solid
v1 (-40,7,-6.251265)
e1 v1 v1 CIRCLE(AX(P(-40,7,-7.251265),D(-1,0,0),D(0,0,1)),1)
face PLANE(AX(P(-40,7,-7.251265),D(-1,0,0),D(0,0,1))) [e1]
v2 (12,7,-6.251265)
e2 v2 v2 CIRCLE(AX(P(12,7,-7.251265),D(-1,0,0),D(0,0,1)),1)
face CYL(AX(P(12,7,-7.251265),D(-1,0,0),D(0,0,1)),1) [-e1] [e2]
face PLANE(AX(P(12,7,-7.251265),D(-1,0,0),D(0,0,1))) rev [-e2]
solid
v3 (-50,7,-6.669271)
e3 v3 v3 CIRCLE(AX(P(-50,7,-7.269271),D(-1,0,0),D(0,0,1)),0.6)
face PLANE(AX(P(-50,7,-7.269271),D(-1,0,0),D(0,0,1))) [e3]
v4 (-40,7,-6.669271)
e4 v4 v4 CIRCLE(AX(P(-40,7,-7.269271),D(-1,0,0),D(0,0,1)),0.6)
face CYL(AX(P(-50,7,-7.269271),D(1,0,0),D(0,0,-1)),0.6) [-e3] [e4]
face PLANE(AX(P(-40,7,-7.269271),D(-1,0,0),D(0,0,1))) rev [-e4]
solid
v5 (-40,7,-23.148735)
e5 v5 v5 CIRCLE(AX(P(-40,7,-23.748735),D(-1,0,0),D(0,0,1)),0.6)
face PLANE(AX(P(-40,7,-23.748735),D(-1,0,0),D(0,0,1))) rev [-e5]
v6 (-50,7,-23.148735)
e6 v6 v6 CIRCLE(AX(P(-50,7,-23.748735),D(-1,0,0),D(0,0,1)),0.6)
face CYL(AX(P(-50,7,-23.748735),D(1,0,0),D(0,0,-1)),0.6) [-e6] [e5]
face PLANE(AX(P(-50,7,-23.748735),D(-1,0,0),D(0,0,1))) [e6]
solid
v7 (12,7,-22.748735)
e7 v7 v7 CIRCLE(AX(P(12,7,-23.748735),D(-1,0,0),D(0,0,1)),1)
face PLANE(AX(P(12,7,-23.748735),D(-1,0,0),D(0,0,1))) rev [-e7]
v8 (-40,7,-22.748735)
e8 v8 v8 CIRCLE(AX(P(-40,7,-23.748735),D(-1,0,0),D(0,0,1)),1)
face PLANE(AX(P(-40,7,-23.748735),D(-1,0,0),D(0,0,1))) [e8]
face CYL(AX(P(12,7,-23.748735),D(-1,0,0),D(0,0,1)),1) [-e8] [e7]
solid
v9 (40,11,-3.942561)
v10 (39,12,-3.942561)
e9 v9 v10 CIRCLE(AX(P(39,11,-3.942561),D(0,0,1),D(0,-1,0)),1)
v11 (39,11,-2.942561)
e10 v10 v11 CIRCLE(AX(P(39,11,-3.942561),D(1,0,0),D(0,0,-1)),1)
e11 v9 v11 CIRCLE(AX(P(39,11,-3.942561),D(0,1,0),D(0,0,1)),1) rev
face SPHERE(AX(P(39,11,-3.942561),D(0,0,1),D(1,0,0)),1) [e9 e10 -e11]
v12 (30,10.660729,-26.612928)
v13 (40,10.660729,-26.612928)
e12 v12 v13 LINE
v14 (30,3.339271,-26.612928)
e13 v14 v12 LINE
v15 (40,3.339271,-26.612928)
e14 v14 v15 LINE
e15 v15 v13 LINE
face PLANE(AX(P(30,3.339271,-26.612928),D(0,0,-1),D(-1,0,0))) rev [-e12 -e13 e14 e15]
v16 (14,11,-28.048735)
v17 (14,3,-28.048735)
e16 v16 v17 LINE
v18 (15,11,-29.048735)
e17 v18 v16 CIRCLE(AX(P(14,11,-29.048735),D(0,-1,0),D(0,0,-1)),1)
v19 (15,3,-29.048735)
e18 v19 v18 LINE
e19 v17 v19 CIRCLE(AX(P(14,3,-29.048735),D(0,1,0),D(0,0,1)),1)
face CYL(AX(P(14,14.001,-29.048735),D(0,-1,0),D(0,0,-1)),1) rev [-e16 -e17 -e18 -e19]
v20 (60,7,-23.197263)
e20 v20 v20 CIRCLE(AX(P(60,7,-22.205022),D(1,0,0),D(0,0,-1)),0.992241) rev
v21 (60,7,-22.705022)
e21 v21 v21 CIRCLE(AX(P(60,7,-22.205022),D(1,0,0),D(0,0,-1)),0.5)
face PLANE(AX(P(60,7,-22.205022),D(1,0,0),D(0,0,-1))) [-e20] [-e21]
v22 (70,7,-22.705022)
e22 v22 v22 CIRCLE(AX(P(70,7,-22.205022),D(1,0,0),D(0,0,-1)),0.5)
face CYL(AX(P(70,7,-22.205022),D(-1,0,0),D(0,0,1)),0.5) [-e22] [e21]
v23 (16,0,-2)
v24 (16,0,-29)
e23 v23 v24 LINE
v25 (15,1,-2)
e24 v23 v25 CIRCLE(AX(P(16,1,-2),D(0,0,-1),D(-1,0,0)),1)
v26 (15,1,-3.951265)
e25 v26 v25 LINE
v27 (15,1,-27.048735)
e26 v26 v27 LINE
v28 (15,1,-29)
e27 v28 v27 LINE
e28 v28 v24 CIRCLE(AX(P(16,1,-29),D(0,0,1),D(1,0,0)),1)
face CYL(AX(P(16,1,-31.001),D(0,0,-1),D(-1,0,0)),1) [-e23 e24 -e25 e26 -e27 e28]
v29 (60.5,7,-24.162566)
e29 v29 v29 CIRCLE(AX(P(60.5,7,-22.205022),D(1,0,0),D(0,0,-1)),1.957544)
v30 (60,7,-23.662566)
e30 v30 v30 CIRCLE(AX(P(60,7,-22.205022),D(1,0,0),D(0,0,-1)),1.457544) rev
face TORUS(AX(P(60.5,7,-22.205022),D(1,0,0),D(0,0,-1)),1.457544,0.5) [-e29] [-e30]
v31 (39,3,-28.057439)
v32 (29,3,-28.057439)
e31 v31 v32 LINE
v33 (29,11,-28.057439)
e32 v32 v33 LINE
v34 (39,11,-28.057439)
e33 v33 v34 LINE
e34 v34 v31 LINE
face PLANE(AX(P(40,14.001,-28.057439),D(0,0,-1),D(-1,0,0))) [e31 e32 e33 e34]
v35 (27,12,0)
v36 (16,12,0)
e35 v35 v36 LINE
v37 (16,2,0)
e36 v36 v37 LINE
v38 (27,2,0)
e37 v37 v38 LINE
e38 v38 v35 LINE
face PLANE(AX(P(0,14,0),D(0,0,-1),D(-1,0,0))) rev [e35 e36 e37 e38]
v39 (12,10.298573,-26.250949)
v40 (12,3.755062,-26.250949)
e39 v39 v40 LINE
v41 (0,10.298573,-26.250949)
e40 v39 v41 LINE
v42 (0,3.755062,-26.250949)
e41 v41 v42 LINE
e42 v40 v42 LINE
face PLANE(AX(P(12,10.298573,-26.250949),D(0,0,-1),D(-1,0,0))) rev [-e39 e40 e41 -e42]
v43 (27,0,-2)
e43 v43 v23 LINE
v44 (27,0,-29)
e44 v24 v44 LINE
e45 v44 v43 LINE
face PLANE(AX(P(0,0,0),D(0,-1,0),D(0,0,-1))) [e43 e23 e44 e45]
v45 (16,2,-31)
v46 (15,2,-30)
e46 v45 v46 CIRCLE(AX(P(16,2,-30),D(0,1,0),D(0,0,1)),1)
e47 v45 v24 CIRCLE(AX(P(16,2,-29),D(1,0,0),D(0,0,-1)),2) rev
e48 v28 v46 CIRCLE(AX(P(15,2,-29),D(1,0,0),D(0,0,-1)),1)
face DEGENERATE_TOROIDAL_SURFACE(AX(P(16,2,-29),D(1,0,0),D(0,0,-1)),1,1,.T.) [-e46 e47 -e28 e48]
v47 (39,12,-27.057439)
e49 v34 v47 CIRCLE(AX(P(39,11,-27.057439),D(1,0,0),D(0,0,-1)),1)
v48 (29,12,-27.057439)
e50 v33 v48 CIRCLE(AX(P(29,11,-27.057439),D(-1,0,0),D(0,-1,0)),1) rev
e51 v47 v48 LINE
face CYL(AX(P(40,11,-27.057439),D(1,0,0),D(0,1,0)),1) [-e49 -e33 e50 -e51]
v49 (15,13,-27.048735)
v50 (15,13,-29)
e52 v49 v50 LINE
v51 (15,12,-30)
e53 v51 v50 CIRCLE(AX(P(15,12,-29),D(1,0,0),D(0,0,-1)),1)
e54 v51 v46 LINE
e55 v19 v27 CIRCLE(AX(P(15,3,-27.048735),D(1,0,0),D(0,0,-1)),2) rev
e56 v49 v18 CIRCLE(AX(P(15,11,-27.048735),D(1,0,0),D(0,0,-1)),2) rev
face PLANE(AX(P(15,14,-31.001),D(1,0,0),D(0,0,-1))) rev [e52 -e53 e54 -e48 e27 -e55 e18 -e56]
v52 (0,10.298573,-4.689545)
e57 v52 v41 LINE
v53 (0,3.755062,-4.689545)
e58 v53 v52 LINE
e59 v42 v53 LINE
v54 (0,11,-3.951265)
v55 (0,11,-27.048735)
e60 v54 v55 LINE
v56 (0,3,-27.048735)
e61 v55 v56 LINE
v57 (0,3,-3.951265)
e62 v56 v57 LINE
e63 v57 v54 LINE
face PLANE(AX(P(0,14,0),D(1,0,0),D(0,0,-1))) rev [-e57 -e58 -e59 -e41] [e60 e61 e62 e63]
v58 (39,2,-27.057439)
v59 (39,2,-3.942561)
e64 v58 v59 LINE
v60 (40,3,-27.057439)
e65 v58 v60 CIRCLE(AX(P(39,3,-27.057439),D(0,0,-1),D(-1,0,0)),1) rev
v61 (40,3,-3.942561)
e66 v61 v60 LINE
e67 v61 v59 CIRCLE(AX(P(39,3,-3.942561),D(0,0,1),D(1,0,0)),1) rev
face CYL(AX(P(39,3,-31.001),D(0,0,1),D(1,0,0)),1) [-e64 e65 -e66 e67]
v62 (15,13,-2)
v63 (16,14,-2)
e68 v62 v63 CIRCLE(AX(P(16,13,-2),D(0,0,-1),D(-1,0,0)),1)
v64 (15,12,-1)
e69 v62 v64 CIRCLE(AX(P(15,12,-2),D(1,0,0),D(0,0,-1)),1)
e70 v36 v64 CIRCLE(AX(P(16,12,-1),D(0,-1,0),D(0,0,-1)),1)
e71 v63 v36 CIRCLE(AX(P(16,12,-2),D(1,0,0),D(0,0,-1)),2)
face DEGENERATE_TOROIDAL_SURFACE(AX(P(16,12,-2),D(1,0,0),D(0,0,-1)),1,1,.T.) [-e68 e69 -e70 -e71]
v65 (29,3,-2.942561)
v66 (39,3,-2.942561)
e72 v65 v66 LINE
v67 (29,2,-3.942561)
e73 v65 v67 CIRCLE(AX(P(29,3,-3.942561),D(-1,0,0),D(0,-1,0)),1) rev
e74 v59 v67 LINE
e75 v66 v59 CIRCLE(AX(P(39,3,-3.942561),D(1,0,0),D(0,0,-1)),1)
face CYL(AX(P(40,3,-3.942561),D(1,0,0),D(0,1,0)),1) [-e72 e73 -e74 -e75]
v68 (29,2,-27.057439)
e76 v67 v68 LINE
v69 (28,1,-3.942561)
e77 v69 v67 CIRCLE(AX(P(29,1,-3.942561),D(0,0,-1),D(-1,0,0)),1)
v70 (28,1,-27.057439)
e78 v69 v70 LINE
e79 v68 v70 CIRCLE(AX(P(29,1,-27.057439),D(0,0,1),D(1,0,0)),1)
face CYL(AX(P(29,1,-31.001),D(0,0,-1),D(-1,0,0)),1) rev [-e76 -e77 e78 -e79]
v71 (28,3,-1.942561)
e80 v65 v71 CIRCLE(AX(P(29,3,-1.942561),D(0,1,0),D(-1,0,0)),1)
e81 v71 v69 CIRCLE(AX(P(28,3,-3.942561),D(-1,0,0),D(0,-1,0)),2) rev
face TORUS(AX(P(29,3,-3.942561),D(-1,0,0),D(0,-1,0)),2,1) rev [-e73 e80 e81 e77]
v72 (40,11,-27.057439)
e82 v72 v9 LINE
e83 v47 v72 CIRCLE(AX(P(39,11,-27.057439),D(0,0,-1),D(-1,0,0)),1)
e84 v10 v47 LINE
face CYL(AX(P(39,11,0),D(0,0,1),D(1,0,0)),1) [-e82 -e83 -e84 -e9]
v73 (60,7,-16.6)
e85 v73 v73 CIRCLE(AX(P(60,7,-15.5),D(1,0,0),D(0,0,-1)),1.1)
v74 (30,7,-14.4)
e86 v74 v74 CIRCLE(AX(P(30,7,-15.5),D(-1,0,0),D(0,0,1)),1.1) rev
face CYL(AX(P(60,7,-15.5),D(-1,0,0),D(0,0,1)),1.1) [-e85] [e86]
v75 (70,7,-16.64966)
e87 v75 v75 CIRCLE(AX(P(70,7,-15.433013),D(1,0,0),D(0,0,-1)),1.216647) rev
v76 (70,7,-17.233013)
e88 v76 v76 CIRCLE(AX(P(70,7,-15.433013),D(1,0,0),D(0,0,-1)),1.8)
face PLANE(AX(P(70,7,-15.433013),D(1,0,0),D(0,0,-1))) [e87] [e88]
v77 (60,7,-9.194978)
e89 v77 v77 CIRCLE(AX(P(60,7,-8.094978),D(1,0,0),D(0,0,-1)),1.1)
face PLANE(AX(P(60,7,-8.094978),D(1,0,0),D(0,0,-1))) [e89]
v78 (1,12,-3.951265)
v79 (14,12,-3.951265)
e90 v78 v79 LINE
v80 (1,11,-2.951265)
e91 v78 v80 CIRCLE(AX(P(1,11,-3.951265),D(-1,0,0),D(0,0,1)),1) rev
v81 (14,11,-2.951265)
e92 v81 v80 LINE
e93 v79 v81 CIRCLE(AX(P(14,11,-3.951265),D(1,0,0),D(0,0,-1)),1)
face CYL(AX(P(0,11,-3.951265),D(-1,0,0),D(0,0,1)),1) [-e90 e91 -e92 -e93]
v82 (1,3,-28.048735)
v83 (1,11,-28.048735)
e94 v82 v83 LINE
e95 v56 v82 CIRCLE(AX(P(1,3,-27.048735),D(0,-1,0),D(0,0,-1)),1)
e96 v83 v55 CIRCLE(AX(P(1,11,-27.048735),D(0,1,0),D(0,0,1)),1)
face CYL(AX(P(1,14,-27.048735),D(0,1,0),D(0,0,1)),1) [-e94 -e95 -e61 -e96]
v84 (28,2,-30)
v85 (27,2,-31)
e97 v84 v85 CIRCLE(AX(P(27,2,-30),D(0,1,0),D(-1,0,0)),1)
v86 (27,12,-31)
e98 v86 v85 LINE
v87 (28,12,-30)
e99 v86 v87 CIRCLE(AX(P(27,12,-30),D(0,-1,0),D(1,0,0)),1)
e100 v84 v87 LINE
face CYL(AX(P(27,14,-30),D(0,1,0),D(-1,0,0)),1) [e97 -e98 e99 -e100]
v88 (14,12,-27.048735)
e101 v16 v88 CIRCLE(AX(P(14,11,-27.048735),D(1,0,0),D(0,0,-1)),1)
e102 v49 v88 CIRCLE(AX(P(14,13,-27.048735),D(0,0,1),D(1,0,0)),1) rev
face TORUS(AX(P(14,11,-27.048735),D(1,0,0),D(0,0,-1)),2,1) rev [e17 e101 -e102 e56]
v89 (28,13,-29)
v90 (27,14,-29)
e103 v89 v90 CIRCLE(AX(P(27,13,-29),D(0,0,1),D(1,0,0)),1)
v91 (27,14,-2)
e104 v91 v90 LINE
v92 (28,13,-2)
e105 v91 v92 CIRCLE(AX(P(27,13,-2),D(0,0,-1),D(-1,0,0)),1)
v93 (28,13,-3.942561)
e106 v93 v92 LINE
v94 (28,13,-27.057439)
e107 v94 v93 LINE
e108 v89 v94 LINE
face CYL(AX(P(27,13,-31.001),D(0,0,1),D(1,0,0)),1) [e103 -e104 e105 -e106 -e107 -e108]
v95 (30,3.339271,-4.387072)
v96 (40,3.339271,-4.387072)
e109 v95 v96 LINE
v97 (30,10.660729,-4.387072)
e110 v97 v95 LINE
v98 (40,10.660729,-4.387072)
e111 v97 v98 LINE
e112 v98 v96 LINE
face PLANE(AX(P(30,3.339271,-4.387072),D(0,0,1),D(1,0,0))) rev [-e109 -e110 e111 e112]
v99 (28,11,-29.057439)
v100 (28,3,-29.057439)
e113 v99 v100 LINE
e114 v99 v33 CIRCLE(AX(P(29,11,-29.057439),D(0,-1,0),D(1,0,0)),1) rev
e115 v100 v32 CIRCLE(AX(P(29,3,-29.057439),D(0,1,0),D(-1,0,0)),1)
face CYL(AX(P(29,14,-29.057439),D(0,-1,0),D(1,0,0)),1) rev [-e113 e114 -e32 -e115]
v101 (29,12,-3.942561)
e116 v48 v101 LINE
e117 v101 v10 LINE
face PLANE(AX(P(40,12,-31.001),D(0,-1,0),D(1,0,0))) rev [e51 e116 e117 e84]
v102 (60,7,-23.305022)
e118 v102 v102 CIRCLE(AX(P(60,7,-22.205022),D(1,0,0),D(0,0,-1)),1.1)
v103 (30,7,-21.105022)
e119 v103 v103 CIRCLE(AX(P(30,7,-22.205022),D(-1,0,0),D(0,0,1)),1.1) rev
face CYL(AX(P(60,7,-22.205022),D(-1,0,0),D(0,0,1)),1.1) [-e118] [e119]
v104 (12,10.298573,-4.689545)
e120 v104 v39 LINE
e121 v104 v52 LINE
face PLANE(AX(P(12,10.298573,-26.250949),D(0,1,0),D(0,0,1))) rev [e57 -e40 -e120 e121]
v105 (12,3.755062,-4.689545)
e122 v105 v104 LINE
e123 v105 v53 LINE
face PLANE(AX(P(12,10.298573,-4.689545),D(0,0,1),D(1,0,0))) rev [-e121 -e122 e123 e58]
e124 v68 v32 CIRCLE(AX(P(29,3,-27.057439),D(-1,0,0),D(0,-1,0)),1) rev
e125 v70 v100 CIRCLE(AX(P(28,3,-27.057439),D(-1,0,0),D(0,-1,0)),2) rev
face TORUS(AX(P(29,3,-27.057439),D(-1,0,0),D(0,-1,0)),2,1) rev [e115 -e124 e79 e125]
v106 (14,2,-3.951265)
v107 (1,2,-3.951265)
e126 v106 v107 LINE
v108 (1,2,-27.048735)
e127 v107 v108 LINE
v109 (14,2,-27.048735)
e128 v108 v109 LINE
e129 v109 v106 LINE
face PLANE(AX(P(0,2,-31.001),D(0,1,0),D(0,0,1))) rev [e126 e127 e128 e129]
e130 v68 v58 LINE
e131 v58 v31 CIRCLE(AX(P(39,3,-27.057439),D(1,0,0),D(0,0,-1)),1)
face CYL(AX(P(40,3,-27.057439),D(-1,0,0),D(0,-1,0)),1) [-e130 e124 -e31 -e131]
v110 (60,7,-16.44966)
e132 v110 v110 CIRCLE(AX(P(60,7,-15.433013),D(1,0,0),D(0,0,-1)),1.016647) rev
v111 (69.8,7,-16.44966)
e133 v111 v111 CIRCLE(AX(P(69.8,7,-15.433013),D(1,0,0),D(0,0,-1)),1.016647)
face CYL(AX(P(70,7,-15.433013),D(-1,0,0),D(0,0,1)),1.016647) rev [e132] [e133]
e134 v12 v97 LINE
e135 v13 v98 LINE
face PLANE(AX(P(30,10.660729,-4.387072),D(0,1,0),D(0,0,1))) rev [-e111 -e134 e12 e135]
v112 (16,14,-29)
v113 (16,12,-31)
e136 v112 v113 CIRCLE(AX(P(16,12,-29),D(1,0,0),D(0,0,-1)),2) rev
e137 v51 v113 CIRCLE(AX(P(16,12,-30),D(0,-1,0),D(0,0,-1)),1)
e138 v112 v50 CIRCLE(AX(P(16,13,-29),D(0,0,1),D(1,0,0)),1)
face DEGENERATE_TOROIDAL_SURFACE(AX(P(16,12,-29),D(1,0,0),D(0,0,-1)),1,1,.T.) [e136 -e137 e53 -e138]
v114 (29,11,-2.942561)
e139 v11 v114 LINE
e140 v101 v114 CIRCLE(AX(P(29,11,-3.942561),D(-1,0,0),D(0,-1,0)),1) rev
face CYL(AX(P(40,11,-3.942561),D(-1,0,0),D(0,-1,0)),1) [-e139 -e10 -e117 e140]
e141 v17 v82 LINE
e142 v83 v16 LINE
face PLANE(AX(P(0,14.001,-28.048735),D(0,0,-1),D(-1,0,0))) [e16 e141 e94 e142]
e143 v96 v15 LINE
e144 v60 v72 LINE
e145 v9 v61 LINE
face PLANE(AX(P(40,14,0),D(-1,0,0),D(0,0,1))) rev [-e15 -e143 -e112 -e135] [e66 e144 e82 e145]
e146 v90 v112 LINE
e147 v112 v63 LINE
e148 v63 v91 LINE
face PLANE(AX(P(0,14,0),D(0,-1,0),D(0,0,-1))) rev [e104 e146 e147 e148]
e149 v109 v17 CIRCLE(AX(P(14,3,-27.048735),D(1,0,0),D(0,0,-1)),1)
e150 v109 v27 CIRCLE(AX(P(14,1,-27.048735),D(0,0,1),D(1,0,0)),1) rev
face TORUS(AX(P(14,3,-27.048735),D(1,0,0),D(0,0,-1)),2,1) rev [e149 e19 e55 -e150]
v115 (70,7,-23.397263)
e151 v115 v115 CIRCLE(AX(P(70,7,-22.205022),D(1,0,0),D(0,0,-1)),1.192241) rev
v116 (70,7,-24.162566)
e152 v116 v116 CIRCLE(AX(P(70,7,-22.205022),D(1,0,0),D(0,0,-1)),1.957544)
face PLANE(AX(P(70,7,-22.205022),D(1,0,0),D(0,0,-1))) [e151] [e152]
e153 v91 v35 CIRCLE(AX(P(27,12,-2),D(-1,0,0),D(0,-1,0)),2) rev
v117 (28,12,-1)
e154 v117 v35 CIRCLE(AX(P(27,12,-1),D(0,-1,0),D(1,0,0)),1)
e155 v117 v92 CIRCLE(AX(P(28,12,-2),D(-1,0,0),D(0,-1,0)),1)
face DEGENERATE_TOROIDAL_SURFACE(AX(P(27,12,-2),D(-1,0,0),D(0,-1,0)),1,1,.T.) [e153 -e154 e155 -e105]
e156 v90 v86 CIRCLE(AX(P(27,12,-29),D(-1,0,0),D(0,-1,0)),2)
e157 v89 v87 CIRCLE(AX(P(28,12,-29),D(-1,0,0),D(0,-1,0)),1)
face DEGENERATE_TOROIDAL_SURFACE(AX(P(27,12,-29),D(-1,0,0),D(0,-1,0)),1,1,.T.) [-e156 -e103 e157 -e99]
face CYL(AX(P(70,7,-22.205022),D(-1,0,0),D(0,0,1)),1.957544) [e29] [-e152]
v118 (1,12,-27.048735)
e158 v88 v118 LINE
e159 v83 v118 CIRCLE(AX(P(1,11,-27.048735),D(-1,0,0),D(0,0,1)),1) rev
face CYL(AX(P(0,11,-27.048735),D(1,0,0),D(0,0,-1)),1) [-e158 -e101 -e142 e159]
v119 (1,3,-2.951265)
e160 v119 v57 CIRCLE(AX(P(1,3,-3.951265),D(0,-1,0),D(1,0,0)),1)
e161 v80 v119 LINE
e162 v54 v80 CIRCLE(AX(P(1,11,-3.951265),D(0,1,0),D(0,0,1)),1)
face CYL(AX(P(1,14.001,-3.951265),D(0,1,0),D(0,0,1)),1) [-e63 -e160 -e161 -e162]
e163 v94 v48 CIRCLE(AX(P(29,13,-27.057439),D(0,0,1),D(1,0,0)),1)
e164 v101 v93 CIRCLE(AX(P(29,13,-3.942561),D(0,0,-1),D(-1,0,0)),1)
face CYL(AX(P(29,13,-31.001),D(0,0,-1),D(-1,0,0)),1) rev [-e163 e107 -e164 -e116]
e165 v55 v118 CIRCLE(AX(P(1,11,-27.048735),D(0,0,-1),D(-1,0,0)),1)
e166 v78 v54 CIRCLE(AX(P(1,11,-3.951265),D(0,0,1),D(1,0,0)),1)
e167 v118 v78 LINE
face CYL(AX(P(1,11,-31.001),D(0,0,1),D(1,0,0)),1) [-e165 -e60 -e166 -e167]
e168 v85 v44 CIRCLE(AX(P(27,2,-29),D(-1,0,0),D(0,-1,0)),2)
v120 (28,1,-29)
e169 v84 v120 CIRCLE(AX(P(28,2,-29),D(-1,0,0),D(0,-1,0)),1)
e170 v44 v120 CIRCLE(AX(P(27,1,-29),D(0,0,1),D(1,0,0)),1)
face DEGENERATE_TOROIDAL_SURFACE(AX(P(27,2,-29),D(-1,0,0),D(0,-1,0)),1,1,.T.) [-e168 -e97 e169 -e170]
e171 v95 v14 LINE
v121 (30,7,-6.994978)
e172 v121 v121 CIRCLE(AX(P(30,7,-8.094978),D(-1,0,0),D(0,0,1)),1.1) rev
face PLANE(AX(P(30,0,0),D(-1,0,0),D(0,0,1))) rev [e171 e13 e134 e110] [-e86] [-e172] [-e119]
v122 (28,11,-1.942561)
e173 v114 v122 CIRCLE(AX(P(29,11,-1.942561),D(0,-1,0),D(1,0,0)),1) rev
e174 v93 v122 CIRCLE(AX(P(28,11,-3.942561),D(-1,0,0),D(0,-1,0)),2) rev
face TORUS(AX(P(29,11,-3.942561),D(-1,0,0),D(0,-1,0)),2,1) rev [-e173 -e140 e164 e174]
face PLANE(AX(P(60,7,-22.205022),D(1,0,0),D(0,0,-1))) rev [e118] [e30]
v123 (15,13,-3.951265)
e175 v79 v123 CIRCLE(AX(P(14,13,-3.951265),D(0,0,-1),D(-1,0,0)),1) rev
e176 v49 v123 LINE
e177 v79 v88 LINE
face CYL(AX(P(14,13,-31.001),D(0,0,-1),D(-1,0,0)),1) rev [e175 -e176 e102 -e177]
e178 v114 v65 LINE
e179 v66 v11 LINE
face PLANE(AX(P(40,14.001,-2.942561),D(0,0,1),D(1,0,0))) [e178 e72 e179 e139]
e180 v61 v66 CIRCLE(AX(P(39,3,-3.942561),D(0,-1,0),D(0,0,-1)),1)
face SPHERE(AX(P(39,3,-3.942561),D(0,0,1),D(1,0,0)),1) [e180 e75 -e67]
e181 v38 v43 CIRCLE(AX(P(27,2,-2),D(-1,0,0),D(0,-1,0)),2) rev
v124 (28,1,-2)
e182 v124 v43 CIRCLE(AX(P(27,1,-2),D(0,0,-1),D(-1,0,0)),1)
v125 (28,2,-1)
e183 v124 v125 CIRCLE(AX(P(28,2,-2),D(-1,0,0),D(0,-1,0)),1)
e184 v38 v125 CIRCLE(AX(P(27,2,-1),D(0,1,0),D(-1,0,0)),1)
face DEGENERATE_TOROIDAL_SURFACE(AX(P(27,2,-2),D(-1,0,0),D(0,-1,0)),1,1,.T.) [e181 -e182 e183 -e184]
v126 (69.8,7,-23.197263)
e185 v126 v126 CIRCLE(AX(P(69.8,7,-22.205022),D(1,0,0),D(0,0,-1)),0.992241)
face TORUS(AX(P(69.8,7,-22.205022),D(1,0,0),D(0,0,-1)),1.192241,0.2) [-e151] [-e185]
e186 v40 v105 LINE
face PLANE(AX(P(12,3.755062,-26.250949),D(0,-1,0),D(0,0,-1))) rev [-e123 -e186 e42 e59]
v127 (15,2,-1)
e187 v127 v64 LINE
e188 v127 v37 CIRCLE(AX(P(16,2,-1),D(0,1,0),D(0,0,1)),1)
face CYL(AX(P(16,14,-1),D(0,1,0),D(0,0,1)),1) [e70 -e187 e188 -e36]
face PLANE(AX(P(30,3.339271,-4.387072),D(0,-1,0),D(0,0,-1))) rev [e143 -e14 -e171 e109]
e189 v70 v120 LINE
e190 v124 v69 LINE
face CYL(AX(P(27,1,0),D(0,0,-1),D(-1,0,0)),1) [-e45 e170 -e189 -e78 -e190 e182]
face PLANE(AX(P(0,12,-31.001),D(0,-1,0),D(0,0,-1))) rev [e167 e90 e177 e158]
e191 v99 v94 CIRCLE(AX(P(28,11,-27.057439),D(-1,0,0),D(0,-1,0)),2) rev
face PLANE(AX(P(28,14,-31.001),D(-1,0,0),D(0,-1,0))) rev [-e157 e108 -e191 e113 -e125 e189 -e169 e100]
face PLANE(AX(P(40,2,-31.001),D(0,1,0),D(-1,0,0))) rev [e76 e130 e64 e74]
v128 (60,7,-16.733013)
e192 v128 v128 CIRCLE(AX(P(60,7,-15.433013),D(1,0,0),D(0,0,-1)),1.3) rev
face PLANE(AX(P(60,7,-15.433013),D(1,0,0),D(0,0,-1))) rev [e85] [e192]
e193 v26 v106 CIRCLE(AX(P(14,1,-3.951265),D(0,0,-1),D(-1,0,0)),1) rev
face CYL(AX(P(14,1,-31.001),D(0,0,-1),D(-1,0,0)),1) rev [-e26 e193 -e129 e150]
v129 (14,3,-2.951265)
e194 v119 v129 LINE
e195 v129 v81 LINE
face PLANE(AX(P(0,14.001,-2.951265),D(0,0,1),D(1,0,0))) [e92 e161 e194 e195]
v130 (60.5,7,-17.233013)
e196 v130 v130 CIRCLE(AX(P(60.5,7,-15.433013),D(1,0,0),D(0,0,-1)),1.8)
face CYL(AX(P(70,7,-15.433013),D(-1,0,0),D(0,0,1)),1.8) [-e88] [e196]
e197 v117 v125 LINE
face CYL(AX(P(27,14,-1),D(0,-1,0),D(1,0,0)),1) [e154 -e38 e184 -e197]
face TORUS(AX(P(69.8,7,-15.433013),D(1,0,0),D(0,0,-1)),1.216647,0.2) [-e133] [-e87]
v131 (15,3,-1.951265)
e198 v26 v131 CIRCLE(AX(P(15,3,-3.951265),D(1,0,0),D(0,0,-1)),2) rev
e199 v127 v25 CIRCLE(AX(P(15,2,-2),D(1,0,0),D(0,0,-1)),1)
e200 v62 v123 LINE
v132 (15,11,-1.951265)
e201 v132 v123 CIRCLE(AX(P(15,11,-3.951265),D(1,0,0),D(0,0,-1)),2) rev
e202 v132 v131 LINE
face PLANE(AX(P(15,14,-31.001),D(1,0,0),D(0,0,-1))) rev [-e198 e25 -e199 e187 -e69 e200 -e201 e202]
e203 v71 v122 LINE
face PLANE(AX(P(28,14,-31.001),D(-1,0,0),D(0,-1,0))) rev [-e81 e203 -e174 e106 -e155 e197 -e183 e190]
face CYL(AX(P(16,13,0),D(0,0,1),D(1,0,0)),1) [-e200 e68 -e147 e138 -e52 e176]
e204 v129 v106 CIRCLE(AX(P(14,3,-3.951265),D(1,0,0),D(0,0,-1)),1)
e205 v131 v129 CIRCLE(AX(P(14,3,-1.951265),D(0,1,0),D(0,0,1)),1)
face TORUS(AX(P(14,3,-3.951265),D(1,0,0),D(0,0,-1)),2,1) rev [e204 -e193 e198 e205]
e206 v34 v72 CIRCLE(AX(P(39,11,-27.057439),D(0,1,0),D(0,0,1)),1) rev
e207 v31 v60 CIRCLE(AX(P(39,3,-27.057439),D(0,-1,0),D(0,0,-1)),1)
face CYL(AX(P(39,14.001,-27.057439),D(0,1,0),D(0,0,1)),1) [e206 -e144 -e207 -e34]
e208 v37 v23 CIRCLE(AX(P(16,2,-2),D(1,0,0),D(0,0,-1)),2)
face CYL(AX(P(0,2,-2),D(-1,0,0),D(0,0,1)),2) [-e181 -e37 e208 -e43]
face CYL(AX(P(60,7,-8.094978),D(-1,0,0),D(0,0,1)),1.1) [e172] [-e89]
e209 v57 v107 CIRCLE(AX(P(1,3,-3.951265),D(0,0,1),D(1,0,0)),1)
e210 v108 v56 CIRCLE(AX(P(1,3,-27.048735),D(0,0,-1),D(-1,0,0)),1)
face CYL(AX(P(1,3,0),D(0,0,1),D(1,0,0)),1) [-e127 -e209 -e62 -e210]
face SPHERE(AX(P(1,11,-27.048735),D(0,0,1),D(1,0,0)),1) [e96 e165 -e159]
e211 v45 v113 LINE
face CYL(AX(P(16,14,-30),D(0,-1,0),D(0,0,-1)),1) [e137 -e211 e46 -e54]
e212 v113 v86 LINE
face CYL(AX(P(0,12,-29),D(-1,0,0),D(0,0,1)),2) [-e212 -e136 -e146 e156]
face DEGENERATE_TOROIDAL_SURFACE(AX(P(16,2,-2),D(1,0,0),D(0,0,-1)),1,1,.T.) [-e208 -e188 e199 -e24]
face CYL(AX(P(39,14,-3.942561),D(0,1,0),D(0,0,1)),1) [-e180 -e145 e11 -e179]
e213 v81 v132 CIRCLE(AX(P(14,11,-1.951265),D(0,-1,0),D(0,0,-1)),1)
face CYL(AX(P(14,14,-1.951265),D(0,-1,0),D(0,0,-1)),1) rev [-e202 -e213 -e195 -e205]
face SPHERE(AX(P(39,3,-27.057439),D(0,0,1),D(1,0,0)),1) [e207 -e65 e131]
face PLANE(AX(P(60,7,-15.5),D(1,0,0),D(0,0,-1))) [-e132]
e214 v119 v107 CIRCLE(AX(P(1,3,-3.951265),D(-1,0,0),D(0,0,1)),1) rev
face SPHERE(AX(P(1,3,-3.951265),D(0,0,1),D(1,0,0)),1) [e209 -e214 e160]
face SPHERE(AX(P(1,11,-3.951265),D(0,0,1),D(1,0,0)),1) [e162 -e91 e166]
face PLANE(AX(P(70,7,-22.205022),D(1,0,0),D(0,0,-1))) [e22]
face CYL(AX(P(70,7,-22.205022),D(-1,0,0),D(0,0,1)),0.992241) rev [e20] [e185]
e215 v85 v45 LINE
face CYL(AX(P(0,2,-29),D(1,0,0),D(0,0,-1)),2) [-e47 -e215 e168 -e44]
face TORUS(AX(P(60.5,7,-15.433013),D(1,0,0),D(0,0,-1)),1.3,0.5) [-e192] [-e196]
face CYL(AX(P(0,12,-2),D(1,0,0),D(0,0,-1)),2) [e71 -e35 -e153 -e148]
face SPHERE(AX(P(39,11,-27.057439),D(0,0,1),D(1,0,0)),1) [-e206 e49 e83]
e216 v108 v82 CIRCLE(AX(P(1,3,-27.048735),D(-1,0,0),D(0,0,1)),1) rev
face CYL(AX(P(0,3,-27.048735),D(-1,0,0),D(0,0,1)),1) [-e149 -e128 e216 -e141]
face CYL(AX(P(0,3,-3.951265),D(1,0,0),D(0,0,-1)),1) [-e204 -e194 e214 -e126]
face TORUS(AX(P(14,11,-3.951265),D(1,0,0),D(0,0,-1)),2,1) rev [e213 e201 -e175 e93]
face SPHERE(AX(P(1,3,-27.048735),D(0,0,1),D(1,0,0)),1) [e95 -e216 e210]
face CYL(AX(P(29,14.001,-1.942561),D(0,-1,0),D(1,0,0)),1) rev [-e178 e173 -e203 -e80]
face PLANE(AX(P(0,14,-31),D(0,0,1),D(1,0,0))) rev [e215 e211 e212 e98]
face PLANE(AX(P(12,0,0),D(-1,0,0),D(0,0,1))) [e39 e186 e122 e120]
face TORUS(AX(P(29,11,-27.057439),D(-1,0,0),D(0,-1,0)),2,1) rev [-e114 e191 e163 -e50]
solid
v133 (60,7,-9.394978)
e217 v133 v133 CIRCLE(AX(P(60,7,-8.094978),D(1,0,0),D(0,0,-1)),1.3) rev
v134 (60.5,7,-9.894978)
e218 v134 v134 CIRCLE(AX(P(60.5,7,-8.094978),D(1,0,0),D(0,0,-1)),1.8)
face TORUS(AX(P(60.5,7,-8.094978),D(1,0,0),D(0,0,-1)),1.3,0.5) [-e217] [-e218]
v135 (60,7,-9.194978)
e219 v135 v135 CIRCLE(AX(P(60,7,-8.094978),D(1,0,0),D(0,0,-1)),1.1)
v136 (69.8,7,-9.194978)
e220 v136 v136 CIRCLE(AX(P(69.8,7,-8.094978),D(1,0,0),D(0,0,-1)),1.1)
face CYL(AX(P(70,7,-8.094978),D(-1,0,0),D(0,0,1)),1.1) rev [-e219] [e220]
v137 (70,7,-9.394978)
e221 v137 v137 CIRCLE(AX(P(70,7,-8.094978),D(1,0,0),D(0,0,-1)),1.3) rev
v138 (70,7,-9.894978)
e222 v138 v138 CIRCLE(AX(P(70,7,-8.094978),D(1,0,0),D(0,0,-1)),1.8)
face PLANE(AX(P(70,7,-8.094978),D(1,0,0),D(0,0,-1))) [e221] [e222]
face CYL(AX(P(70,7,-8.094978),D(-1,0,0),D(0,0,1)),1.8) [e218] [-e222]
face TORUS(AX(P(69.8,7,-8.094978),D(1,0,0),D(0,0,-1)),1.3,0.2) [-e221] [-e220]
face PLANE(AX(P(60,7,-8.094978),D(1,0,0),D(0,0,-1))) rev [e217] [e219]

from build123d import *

# Parameters (mm, degrees)
SKETCH1_W                  = 40
SKETCH1_H                  = 31
BOSS_EXTRUDE1_DEPTH        = 14
CUT_EXTRUDE4_REACH         = 54.507
SKETCH5_W                  = 15
SKETCH5_H                  = 2
SKETCH5_W_2                = 12
CUT_EXTRUDE5_REACH         = 54.507
SKETCH6_W                  = 12
SKETCH6_H                  = 2.942561473
SKETCH6_W_2                = 15
SKETCH6_H_2                = 2.951265474
FILLET4_R                  = 1
SKETCH7_W                  = 22.225856006
SKETCH7_H                  = 7.321457
CUT_EXTRUDE6_DEPTH         = 10
SKETCH8_R                  = 1.1
BOSS_EXTRUDE2_DEPTH        = 30
SKETCH9_R                  = 1.8
SKETCH9_R_2                = 1.1
SKETCH9_R_3                = 1.016647114
SKETCH9_R_4                = 1.957544334
SKETCH9_R_5                = 0.992240875
BOSS_EXTRUDE3_DEPTH        = 10
FILLET5_R                  = 0.5
FILLET6_R                  = 0.5
FILLET7_R                  = 0.2
FILLET8_R                  = 0.2
SKETCH11_R                 = 0.5
BOSS_EXTRUDE5_DEPTH        = 10
BOSS_EXTRUDE6_DEPTH        = 40
BOSS_EXTRUDE6_DEPTH_BACK   = 12
SKETCH12_R                 = 1
BOSS_EXTRUDE6_2_DEPTH      = 40
BOSS_EXTRUDE6_2_DEPTH_BACK = 12
SKETCH13_R                 = 0.6
BOSS_EXTRUDE7_DEPTH        = 10
BOSS_EXTRUDE7_2_DEPTH      = 10
SKETCH14_W                 = 21.561403949
SKETCH14_H                 = 6.543510651
CUT_EXTRUDE8_DEPTH         = 12
FILLET10_R                 = 2


# Some blends are built 0.0001 mm under size
with BuildPart() as part:
    # Sketch1 → Boss-Extrude1 (new body)
    with BuildSketch(Plane(origin=(0, 0, 0), x_dir=(1, 0, 0), z_dir=(0, 1, 0))):
        with Locations((20, 15.5)):
            Rectangle(SKETCH1_W, SKETCH1_H)
    extrude(amount=BOSS_EXTRUDE1_DEPTH)

    # Sketch5 → Cut-Extrude4 (cut, up to next)
    with BuildSketch(Plane.XY, mode=Mode.PRIVATE) as cut_extrude4_sk1:
        with Locations((7.5, 13)):
            Rectangle(SKETCH5_W, SKETCH5_H)
    cut_extrude4_tool1 = extrude(cut_extrude4_sk1.sketch, amount=-CUT_EXTRUDE4_REACH, mode=Mode.PRIVATE) & part.part
    # Sketch5 → Cut-Extrude4 (cut, up to next)
    with BuildSketch(Plane.XY, mode=Mode.PRIVATE) as cut_extrude4_sk2:
        with Locations((7.5, 1)):
            Rectangle(SKETCH5_W, SKETCH5_H)
    cut_extrude4_tool2 = extrude(cut_extrude4_sk2.sketch, amount=-CUT_EXTRUDE4_REACH, mode=Mode.PRIVATE) & part.part
    # Sketch5 → Cut-Extrude4 (cut, up to next)
    with BuildSketch(Plane.XY, mode=Mode.PRIVATE) as cut_extrude4_sk3:
        with Locations((34, 1)):
            Rectangle(SKETCH5_W_2, SKETCH5_H)
    cut_extrude4_tool3 = extrude(cut_extrude4_sk3.sketch, amount=-CUT_EXTRUDE4_REACH, mode=Mode.PRIVATE) & part.part
    # Sketch5 → Cut-Extrude4 (cut, up to next)
    with BuildSketch(Plane.XY, mode=Mode.PRIVATE) as cut_extrude4_sk4:
        with Locations((34, 13)):
            Rectangle(SKETCH5_W_2, SKETCH5_H)
    cut_extrude4_tool4 = extrude(cut_extrude4_sk4.sketch, amount=-CUT_EXTRUDE4_REACH, mode=Mode.PRIVATE) & part.part
    add(cut_extrude4_tool1.solids().sort_by_distance((7.5, 13, 0))[0], mode=Mode.SUBTRACT)
    add(cut_extrude4_tool2.solids().sort_by_distance((7.5, 1, 0))[0], mode=Mode.SUBTRACT)
    add(cut_extrude4_tool3.solids().sort_by_distance((34, 1, 0))[0], mode=Mode.SUBTRACT)
    add(cut_extrude4_tool4.solids().sort_by_distance((34, 13, 0))[0], mode=Mode.SUBTRACT)

    # Sketch6 → Cut-Extrude5 (cut, up to next)
    with BuildSketch(Plane(origin=(0, 0, 0), x_dir=(1, 0, 0), z_dir=(0, 1, 0)), mode=Mode.PRIVATE) as cut_extrude5_sk1:
        with Locations((34, 29.528719264)):
            Rectangle(SKETCH6_W, SKETCH6_H)
    cut_extrude5_tool1 = extrude(cut_extrude5_sk1.sketch, amount=CUT_EXTRUDE5_REACH, mode=Mode.PRIVATE) & part.part
    # Sketch6 → Cut-Extrude5 (cut, up to next)
    with BuildSketch(Plane(origin=(0, 0, 0), x_dir=(1, 0, 0), z_dir=(0, 1, 0)), mode=Mode.PRIVATE) as cut_extrude5_sk2:
        with Locations((7.5, 1.475632737)):
            Rectangle(SKETCH6_W_2, SKETCH6_H_2)
    cut_extrude5_tool2 = extrude(cut_extrude5_sk2.sketch, amount=CUT_EXTRUDE5_REACH, mode=Mode.PRIVATE) & part.part
    # Sketch6 → Cut-Extrude5 (cut, up to next)
    with BuildSketch(Plane(origin=(0, 0, 0), x_dir=(1, 0, 0), z_dir=(0, 1, 0)), mode=Mode.PRIVATE) as cut_extrude5_sk3:
        with Locations((7.5, 29.524367263)):
            Rectangle(SKETCH6_W_2, SKETCH6_H_2)
    cut_extrude5_tool3 = extrude(cut_extrude5_sk3.sketch, amount=CUT_EXTRUDE5_REACH, mode=Mode.PRIVATE) & part.part
    # Sketch6 → Cut-Extrude5 (cut, up to next)
    with BuildSketch(Plane(origin=(0, 0, 0), x_dir=(1, 0, 0), z_dir=(0, 1, 0)), mode=Mode.PRIVATE) as cut_extrude5_sk4:
        with Locations((34, 1.471280737)):
            Rectangle(SKETCH6_W, SKETCH6_H)
    cut_extrude5_tool4 = extrude(cut_extrude5_sk4.sketch, amount=CUT_EXTRUDE5_REACH, mode=Mode.PRIVATE) & part.part
    add(cut_extrude5_tool1.solids().sort_by_distance((34, 0, -29.528719))[0], mode=Mode.SUBTRACT)
    add(cut_extrude5_tool2.solids().sort_by_distance((7.5, 0, -1.475633))[0], mode=Mode.SUBTRACT)
    add(cut_extrude5_tool3.solids().sort_by_distance((7.5, 0, -29.524367))[0], mode=Mode.SUBTRACT)
    add(cut_extrude5_tool4.solids().sort_by_distance((34, 0, -1.471281))[0], mode=Mode.SUBTRACT)

    # Fillet4
    fillet4_edges = [part.edges().sort_by_distance(p)[0] for p in [
        (15, 14, -15.5),
        (15, 7, 0),
        (15, 7, -31),
        (15, 0, -15.5),
        (28, 14, -15.5),
        (28, 7, 0),
        (28, 7, -31),
        (28, 0, -15.5),
        (15, 2, -15.5),
        (0, 2, -15.5),
        (0, 12, -15.5),
        (15, 12, -15.5),
        (7.5, 12, -28.048734526),
        (0, 7, -28.048734526),
        (7.5, 2, -28.048734526),
        (15, 7, -28.048734526),
        (28, 12, -15.5),
        (40, 12, -15.5),
        (40, 2, -15.5),
        (28, 2, -15.5),
        (0, 7, -2.951265474),
        (7.5, 12, -2.951265474),
        (15, 7, -2.951265474),
        (7.5, 2, -2.951265474),
        (28, 7, -28.057438527),
        (34, 2, -28.057438527),
        (34, 12, -28.057438527),
        (40, 7, -28.057438527),
        (28, 7, -2.942561473),
        (40, 7, -2.942561473),
        (34, 2, -2.942561473),
        (34, 12, -2.942561473),
    ]]
    fillet(fillet4_edges, radius=FILLET4_R - 0.0001)  # a hair under: the kernel refuses the full size

    # Sketch7 → Cut-Extrude6 (cut)
    with BuildSketch(Plane(origin=(40, 0, 0), x_dir=(0, 0, -1), z_dir=(1, 0, 0))):
        with Locations((15.5, 7)):
            Rectangle(SKETCH7_W, SKETCH7_H)
    extrude(amount=-CUT_EXTRUDE6_DEPTH, mode=Mode.SUBTRACT)

    # Sketch8 → Boss-Extrude2 (add)
    with BuildSketch(Plane(origin=(30, 0, 0), x_dir=(0, 0, -1), z_dir=(1, 0, 0))):
        with Locations(Location((15.5, 7, 0), (0, 0, 180))):
            Circle(SKETCH8_R)
        with Locations(Location((8.094977578, 7, 0), (0, 0, 180))):
            Circle(SKETCH8_R)
        with Locations(Location((22.205021777, 7, 0), (0, 0, 180))):
            Circle(SKETCH8_R)
    extrude(amount=BOSS_EXTRUDE2_DEPTH)

    # Sketch9 → Boss-Extrude3 (add)
    # profile 1 of 3: a face of its own
    with BuildSketch(Plane(origin=(60, 0, 0), x_dir=(0, 0, -1), z_dir=(1, 0, 0))):
        with Locations((8.094977578, 7)):
            Circle(SKETCH9_R)
        with Locations((8.094977578, 7)):
            Circle(SKETCH9_R_2, mode=Mode.SUBTRACT)
    # profile 2 of 3: a face of its own
    with BuildSketch(Plane(origin=(60, 0, 0), x_dir=(0, 0, -1), z_dir=(1, 0, 0))):
        with Locations((15.433013317, 7)):
            Circle(SKETCH9_R)
        with Locations((15.433013317, 7)):
            Circle(SKETCH9_R_3, mode=Mode.SUBTRACT)
    # profile 3 of 3: a face of its own
    with BuildSketch(Plane(origin=(60, 0, 0), x_dir=(0, 0, -1), z_dir=(1, 0, 0))):
        with Locations((22.205021777, 7)):
            Circle(SKETCH9_R_4)
        with Locations((22.205021777, 7)):
            Circle(SKETCH9_R_5, mode=Mode.SUBTRACT)
    extrude(amount=BOSS_EXTRUDE3_DEPTH)


with BuildPart() as boss_extrude3_piece_1:
    # of the separate pieces the step leaves, piece 1, a body of its own (boss_extrude3_pieces)
    add(part.part.solids().sort_by_distance((15.9999, 0, 0))[0])

    # Fillet6
    fillet6_edges = [boss_extrude3_piece_1.edges().sort_by_distance(p)[0] for p in [
        (60, 7, -13.633013317),
        (60, 7, -20.247477443),
    ]]
    fillet(fillet6_edges, radius=FILLET6_R)

    # Fillet8
    fillet8_edges = [boss_extrude3_piece_1.edges().sort_by_distance(p)[0] for p in [
        (70, 7, -14.416366203),
        (70, 7, -21.212780902),
    ]]
    fillet(fillet8_edges, radius=FILLET8_R)

    # Sketch11 → Boss-Extrude5 (add)
    with BuildSketch(Plane(origin=(60, 0, 0), x_dir=(0, 0, -1), z_dir=(1, 0, 0))):
        with Locations((22.205021777, 7)):
            Circle(SKETCH11_R)
    extrude(amount=BOSS_EXTRUDE5_DEPTH)

    # Sketch14 → Cut-Extrude8 (cut)
    with BuildSketch(Plane.ZY):
        with Locations((-15.470247164, 7.026817667)):
            Rectangle(SKETCH14_W, SKETCH14_H)
    extrude(amount=-CUT_EXTRUDE8_DEPTH, mode=Mode.SUBTRACT)

    # Fillet10
    # the kernel refuses this fillet: 2 mm, written as the material it takes off along each edge
    with BuildSketch(Plane(origin=(28, 12, -29), x_dir=(0, 0, -1), z_dir=(0, -1, 0))) as fillet10_piece_1:
        with BuildLine():
            CenterArc((1.0001, -0.9999), 0.9999, 0, 90)
            Line((2, -0.9999), (2, 0))
            Line((2, 0), (1.0001, 0))
        make_face()
    revolve(axis=Axis((28, 12, -29), (1, 0, 0)), revolution_arc=90, mode=Mode.SUBTRACT)
    with BuildSketch(Plane(origin=(28, 12, -2), x_dir=(0, 1, 0), z_dir=(0, 0, -1))) as fillet10_piece_2:
        with BuildLine():
            CenterArc((1.0001, -0.9999), 0.9999, 0, 90)
            Line((2, -0.9999), (2, 0))
            Line((2, 0), (1.0001, 0))
        make_face()
    revolve(axis=Axis((28, 12, -2), (1, 0, 0)), revolution_arc=90, mode=Mode.SUBTRACT)
    with BuildSketch(Plane(origin=(28, 2, -29), x_dir=(0, -1, 0), z_dir=(0, 0, 1))) as fillet10_piece_3:
        with BuildLine():
            CenterArc((1.0001, -0.9999), 0.9999, 0, 90)
            Line((2, -0.9999), (2, 0))
            Line((2, 0), (1.0001, 0))
        make_face()
    revolve(axis=Axis((28, 2, -29), (1, 0, 0)), revolution_arc=90, mode=Mode.SUBTRACT)
    with BuildSketch(Plane(origin=(28, 2, -2), x_dir=(0, 0, 1), z_dir=(0, 1, 0))) as fillet10_piece_4:
        with BuildLine():
            CenterArc((1.0001, -0.9999), 0.9999, 0, 90)
            Line((2, -0.9999), (2, 0))
            Line((2, 0), (1.0001, 0))
        make_face()
    revolve(axis=Axis((28, 2, -2), (1, 0, 0)), revolution_arc=90, mode=Mode.SUBTRACT)
    with BuildSketch(Plane(origin=(15, 12, -2), x_dir=(0, 0, 1), z_dir=(0, -1, 0))) as fillet10_piece_5:
        with BuildLine():
            CenterArc((1.0001, -0.9999), 0.9999, 0, 90)
            Line((2, -0.9999), (2, 0))
            Line((2, 0), (1.0001, 0))
        make_face()
    revolve(axis=Axis((15, 12, -2), (-1, 0, 0)), revolution_arc=90, mode=Mode.SUBTRACT)
    with BuildSketch(Plane(origin=(15, 2, -2), x_dir=(0, -1, 0), z_dir=(0, 0, -1))) as fillet10_piece_6:
        with BuildLine():
            CenterArc((1.0001, -0.9999), 0.9999, 0, 90)
            Line((2, -0.9999), (2, 0))
            Line((2, 0), (1.0001, 0))
        make_face()
    revolve(axis=Axis((15, 2, -2), (-1, 0, 0)), revolution_arc=90, mode=Mode.SUBTRACT)
    with BuildSketch(Plane(origin=(15, 12, -29), x_dir=(0, 1, 0), z_dir=(0, 0, 1))) as fillet10_piece_7:
        with BuildLine():
            CenterArc((1.0001, -0.9999), 0.9999, 0, 90)
            Line((2, -0.9999), (2, 0))
            Line((2, 0), (1.0001, 0))
        make_face()
    revolve(axis=Axis((15, 12, -29), (-1, 0, 0)), revolution_arc=90, mode=Mode.SUBTRACT)
    with BuildSketch(Plane(origin=(15, 2, -29), x_dir=(0, 0, -1), z_dir=(0, 1, 0))) as fillet10_piece_8:
        with BuildLine():
            CenterArc((1.0001, -0.9999), 0.9999, 0, 90)
            Line((2, -0.9999), (2, 0))
            Line((2, 0), (1.0001, 0))
        make_face()
    revolve(axis=Axis((15, 2, -29), (-1, 0, 0)), revolution_arc=90, mode=Mode.SUBTRACT)
    with BuildSketch(Plane(origin=(28, 0, -31), x_dir=(0, 1, 0), z_dir=(-1, 0, 0)), Plane(origin=(15, 0, 0), x_dir=(0, 1, 0), z_dir=(1, 0, 0)), Plane(origin=(15, 14, 0), x_dir=(0, 0, -1), z_dir=(1, 0, 0)), Plane(origin=(28, 14, -31), x_dir=(0, 0, 1), z_dir=(-1, 0, 0))) as fillet10_piece_9:
        with BuildLine():
            CenterArc((FILLET10_R, -FILLET10_R), FILLET10_R, 90, 90)
            Line((0, -FILLET10_R), (0, 0))
            Line((0, 0), (FILLET10_R, 0))
        make_face()
    extrude(amount=13, mode=Mode.SUBTRACT)


with BuildPart() as boss_extrude3_piece_2:
    # of the separate pieces the step leaves, piece 2, a body of its own (boss_extrude3_pieces)
    add(part.part.solids().sort_by_distance((70, 7, -9.194977578))[0])

    # Fillet5
    fillet5_edges = [boss_extrude3_piece_2.edges().sort_by_distance(p)[0] for p in [
        (60, 7, -6.294977578),
    ]]
    fillet(fillet5_edges, radius=FILLET5_R)

    # Fillet7
    fillet7_edges = [boss_extrude3_piece_2.edges().sort_by_distance(p)[0] for p in [
        (70, 7, -6.994977578),
    ]]
    fillet(fillet7_edges, radius=FILLET7_R)


with BuildPart() as body_3:
    # Sketch12 → Boss-Extrude6 (new, two sides: drawn at the far end of the back side and taken through both)
    with BuildSketch(Plane.ZY.offset(-BOSS_EXTRUDE6_DEPTH_BACK)):
        with Locations((-23.748734526, 7)):
            Circle(SKETCH12_R)
    extrude(amount=BOSS_EXTRUDE6_DEPTH + BOSS_EXTRUDE6_DEPTH_BACK)


with BuildPart() as body_4:
    # Sketch12 → Boss-Extrude6 2 (new, two sides: drawn at the far end of the back side and taken through both)
    with BuildSketch(Plane.ZY.offset(-BOSS_EXTRUDE6_2_DEPTH_BACK)):
        with Locations((-7.251265474, 7)):
            Circle(SKETCH12_R)
    extrude(amount=BOSS_EXTRUDE6_2_DEPTH + BOSS_EXTRUDE6_2_DEPTH_BACK)


with BuildPart() as body_5:
    # Sketch13 → Boss-Extrude7 (new body)
    with BuildSketch(Plane.ZY.offset(40)):
        with Locations((-23.748734526, 7)):
            Circle(SKETCH13_R)
    extrude(amount=BOSS_EXTRUDE7_DEPTH)


with BuildPart() as body_6:
    # Sketch13 → Boss-Extrude7 2 (new body)
    with BuildSketch(Plane.ZY.offset(40)):
        with Locations((-7.269270881, 7)):
            Circle(SKETCH13_R)
    extrude(amount=BOSS_EXTRUDE7_2_DEPTH)


solid = Compound([boss_extrude3_piece_1.part, boss_extrude3_piece_2.part, body_3.part, body_4.part, body_5.part, body_6.part])
